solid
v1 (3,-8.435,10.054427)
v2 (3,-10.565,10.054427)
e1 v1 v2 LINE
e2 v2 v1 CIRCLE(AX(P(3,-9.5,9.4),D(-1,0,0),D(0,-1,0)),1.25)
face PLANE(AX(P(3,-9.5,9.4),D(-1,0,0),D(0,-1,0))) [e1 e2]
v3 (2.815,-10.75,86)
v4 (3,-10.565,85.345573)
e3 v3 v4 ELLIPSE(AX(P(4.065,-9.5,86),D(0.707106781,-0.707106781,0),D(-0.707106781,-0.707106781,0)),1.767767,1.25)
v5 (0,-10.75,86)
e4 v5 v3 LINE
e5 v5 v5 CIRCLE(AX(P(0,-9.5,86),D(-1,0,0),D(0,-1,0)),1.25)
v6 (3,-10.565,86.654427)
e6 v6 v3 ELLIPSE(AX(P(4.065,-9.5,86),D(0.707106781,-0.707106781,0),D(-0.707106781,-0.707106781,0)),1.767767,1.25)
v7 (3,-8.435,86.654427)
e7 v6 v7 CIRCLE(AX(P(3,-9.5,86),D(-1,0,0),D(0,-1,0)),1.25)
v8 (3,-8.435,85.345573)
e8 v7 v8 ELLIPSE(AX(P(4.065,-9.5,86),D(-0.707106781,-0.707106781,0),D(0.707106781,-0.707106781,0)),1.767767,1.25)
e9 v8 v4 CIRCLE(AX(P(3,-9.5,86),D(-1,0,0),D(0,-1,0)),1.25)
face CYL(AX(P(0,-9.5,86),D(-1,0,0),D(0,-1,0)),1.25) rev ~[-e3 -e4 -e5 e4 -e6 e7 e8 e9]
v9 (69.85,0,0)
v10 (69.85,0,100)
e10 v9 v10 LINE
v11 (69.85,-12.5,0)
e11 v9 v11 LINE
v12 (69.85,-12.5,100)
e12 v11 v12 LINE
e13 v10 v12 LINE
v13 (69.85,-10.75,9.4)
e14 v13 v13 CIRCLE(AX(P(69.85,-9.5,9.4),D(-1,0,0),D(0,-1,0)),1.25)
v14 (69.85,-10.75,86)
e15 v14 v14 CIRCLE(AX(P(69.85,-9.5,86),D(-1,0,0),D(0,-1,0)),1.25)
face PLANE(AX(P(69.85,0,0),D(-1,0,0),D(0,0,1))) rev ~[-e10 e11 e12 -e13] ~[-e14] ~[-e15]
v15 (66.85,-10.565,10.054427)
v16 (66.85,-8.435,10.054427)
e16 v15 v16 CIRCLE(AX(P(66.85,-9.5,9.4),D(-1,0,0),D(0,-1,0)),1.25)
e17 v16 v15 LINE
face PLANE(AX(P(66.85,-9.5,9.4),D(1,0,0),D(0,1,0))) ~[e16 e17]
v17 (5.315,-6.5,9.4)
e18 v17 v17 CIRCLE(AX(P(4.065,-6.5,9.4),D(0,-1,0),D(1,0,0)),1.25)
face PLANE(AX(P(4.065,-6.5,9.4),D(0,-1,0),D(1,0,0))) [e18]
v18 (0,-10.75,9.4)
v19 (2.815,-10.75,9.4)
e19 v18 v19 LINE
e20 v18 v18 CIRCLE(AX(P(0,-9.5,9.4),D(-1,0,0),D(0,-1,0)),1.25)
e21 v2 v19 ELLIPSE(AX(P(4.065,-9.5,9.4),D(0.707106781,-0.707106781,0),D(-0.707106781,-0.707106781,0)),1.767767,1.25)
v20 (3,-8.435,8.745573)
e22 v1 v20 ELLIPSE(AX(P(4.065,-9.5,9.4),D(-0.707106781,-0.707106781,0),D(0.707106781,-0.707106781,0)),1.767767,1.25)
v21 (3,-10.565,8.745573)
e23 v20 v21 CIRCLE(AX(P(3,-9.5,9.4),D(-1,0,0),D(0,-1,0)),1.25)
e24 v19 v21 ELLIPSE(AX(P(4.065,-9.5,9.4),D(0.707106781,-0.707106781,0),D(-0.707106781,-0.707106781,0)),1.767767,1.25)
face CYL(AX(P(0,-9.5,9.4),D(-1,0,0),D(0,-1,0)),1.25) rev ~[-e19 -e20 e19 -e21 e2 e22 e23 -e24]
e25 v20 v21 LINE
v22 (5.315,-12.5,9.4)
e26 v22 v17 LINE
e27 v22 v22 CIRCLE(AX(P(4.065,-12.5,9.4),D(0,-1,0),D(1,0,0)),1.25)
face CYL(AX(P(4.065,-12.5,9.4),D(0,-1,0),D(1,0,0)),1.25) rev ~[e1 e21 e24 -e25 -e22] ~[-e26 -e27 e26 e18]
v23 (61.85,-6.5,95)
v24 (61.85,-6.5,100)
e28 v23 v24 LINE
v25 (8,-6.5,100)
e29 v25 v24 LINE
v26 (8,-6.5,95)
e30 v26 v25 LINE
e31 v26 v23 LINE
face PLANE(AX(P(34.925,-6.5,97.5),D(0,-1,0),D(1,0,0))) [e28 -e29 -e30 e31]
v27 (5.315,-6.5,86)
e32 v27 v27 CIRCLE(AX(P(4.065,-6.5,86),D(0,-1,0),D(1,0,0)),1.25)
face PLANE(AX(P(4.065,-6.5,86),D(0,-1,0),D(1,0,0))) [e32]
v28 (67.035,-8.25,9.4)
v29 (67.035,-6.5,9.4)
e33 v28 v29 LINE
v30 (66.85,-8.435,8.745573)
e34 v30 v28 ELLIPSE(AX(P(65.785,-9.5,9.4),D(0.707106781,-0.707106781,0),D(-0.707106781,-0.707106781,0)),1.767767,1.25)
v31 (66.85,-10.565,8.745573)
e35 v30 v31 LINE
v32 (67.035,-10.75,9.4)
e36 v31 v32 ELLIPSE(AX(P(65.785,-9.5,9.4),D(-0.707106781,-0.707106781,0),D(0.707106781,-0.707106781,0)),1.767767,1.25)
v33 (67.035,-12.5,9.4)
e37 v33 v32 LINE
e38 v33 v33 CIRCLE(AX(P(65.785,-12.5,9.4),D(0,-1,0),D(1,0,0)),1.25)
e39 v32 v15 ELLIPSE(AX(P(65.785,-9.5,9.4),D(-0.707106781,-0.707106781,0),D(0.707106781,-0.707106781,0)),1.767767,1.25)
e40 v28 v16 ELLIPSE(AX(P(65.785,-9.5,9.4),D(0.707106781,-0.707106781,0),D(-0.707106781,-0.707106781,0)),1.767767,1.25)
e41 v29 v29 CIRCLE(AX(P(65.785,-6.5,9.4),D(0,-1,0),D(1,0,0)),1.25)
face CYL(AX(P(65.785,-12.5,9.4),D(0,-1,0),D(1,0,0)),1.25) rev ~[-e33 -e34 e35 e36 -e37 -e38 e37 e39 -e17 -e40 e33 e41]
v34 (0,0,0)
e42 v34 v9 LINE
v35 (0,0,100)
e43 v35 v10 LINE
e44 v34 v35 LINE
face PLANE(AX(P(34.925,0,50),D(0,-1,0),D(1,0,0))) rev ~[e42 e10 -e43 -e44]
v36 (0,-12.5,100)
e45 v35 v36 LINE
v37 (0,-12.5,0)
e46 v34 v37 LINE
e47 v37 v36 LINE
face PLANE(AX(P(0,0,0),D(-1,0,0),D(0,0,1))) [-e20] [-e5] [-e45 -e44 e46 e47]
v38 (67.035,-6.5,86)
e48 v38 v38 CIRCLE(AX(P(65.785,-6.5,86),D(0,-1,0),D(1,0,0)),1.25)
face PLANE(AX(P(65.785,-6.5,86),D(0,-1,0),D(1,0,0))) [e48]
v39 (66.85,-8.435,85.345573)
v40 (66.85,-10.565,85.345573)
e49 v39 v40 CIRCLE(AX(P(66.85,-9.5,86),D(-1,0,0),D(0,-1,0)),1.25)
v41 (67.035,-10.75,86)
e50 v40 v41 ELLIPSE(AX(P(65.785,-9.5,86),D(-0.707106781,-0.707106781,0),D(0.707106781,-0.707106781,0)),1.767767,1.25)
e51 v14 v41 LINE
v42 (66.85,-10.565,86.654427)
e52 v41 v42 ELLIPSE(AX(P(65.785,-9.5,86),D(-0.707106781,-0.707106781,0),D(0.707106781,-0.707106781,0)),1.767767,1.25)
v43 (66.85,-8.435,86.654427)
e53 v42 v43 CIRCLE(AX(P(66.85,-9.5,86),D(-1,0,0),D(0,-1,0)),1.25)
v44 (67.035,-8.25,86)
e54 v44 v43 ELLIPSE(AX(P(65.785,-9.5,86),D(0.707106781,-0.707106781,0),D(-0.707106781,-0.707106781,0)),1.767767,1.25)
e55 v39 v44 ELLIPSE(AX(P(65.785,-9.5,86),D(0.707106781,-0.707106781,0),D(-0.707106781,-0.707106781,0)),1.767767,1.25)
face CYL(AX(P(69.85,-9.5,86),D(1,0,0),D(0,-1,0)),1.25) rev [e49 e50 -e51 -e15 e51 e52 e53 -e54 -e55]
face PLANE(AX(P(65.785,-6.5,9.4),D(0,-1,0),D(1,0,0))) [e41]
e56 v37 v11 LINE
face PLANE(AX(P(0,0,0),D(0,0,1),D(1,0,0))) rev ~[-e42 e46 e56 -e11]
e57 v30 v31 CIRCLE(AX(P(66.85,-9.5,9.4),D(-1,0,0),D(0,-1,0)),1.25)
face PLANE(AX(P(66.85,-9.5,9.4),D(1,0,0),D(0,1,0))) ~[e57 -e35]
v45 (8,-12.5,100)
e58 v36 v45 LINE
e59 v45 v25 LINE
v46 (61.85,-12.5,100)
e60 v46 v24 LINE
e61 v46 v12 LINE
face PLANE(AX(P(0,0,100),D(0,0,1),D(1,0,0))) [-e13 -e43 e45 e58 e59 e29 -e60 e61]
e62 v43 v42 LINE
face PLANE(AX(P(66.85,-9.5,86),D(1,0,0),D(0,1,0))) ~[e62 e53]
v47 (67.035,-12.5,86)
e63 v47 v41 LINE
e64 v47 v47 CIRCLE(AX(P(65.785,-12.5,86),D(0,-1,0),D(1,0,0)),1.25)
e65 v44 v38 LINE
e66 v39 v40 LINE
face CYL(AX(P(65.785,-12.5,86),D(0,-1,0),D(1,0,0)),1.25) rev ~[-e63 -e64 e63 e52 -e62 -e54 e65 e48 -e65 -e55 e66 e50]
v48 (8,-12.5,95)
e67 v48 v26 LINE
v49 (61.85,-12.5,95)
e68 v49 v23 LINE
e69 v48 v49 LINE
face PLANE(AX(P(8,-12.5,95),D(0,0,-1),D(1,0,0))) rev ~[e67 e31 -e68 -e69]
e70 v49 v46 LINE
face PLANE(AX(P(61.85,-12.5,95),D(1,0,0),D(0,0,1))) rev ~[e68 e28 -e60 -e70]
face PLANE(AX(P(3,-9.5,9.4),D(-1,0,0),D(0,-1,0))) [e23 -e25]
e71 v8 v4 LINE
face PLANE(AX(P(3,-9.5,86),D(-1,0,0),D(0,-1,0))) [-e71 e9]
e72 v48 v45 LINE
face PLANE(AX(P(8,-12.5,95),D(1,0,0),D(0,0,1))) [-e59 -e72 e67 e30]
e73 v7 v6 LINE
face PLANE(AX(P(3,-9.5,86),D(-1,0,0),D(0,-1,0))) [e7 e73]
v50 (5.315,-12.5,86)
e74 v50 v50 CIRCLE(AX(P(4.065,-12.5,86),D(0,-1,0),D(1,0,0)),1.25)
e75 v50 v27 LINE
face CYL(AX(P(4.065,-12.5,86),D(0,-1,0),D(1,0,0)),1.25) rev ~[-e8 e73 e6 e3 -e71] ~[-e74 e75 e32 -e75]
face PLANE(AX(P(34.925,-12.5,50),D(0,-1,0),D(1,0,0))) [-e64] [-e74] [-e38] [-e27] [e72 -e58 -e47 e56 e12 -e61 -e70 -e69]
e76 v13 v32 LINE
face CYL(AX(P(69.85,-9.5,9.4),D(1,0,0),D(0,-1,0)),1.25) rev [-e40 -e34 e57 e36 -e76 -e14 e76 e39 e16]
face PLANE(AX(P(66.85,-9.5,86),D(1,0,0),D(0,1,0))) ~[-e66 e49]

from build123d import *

# Parameters (mm, degrees)
F0_W     = 69.85
F0_H     = 100
F1_DEPTH = 12.5
F2_R     = 1.25
F2_W     = 53.85
F2_H     = 5
F3_DEPTH = 6
F4_R     = 1.25
F5_DEPTH = 3


# Not quite as in the source:
# - a pattern or mirror of a feature is missing from the dataset's text; its kind, count and spacing are read off the source's solid


with BuildPart() as f1:
    # F0 (on Front) → F1 (new body)
    with BuildSketch(Plane.XZ):
        with Locations((34.925, 50)):
            Rectangle(F0_W, F0_H)
    extrude(amount=F1_DEPTH)

    # F2 (on face) → F3 (cut)
    with BuildSketch(Plane.XZ.offset(12.5)):
        with Locations((4.065, 9.4)):
            Circle(F2_R)
        with Locations((4.065, 86)):
            Circle(F2_R)
        with Locations((65.785, 9.4)):
            Circle(F2_R)
        with Locations((65.785, 86)):
            Circle(F2_R)
        with Locations((34.925, 97.5)):
            Rectangle(F2_W, F2_H)
    extrude(amount=-F3_DEPTH, mode=Mode.SUBTRACT)

    # F4 (on face) → F5 (cut)
    with BuildSketch(Plane(origin=(0, 0, 0), x_dir=(0, -1, 0), z_dir=(-1, 0, 0))):
        with Locations((9.5, 86)):
            Circle(F4_R)
        with Locations((9.5, 9.4)):
            Circle(F4_R)
    f5 = extrude(amount=-F5_DEPTH, mode=Mode.SUBTRACT)

    # F5_copies: F5 across plane
    add(f5.mirror(Plane(origin=(34.925, 0, 0), x_dir=(0, 0, 1), z_dir=(1, 0, 0))), mode=Mode.SUBTRACT)


solid = f1.part
